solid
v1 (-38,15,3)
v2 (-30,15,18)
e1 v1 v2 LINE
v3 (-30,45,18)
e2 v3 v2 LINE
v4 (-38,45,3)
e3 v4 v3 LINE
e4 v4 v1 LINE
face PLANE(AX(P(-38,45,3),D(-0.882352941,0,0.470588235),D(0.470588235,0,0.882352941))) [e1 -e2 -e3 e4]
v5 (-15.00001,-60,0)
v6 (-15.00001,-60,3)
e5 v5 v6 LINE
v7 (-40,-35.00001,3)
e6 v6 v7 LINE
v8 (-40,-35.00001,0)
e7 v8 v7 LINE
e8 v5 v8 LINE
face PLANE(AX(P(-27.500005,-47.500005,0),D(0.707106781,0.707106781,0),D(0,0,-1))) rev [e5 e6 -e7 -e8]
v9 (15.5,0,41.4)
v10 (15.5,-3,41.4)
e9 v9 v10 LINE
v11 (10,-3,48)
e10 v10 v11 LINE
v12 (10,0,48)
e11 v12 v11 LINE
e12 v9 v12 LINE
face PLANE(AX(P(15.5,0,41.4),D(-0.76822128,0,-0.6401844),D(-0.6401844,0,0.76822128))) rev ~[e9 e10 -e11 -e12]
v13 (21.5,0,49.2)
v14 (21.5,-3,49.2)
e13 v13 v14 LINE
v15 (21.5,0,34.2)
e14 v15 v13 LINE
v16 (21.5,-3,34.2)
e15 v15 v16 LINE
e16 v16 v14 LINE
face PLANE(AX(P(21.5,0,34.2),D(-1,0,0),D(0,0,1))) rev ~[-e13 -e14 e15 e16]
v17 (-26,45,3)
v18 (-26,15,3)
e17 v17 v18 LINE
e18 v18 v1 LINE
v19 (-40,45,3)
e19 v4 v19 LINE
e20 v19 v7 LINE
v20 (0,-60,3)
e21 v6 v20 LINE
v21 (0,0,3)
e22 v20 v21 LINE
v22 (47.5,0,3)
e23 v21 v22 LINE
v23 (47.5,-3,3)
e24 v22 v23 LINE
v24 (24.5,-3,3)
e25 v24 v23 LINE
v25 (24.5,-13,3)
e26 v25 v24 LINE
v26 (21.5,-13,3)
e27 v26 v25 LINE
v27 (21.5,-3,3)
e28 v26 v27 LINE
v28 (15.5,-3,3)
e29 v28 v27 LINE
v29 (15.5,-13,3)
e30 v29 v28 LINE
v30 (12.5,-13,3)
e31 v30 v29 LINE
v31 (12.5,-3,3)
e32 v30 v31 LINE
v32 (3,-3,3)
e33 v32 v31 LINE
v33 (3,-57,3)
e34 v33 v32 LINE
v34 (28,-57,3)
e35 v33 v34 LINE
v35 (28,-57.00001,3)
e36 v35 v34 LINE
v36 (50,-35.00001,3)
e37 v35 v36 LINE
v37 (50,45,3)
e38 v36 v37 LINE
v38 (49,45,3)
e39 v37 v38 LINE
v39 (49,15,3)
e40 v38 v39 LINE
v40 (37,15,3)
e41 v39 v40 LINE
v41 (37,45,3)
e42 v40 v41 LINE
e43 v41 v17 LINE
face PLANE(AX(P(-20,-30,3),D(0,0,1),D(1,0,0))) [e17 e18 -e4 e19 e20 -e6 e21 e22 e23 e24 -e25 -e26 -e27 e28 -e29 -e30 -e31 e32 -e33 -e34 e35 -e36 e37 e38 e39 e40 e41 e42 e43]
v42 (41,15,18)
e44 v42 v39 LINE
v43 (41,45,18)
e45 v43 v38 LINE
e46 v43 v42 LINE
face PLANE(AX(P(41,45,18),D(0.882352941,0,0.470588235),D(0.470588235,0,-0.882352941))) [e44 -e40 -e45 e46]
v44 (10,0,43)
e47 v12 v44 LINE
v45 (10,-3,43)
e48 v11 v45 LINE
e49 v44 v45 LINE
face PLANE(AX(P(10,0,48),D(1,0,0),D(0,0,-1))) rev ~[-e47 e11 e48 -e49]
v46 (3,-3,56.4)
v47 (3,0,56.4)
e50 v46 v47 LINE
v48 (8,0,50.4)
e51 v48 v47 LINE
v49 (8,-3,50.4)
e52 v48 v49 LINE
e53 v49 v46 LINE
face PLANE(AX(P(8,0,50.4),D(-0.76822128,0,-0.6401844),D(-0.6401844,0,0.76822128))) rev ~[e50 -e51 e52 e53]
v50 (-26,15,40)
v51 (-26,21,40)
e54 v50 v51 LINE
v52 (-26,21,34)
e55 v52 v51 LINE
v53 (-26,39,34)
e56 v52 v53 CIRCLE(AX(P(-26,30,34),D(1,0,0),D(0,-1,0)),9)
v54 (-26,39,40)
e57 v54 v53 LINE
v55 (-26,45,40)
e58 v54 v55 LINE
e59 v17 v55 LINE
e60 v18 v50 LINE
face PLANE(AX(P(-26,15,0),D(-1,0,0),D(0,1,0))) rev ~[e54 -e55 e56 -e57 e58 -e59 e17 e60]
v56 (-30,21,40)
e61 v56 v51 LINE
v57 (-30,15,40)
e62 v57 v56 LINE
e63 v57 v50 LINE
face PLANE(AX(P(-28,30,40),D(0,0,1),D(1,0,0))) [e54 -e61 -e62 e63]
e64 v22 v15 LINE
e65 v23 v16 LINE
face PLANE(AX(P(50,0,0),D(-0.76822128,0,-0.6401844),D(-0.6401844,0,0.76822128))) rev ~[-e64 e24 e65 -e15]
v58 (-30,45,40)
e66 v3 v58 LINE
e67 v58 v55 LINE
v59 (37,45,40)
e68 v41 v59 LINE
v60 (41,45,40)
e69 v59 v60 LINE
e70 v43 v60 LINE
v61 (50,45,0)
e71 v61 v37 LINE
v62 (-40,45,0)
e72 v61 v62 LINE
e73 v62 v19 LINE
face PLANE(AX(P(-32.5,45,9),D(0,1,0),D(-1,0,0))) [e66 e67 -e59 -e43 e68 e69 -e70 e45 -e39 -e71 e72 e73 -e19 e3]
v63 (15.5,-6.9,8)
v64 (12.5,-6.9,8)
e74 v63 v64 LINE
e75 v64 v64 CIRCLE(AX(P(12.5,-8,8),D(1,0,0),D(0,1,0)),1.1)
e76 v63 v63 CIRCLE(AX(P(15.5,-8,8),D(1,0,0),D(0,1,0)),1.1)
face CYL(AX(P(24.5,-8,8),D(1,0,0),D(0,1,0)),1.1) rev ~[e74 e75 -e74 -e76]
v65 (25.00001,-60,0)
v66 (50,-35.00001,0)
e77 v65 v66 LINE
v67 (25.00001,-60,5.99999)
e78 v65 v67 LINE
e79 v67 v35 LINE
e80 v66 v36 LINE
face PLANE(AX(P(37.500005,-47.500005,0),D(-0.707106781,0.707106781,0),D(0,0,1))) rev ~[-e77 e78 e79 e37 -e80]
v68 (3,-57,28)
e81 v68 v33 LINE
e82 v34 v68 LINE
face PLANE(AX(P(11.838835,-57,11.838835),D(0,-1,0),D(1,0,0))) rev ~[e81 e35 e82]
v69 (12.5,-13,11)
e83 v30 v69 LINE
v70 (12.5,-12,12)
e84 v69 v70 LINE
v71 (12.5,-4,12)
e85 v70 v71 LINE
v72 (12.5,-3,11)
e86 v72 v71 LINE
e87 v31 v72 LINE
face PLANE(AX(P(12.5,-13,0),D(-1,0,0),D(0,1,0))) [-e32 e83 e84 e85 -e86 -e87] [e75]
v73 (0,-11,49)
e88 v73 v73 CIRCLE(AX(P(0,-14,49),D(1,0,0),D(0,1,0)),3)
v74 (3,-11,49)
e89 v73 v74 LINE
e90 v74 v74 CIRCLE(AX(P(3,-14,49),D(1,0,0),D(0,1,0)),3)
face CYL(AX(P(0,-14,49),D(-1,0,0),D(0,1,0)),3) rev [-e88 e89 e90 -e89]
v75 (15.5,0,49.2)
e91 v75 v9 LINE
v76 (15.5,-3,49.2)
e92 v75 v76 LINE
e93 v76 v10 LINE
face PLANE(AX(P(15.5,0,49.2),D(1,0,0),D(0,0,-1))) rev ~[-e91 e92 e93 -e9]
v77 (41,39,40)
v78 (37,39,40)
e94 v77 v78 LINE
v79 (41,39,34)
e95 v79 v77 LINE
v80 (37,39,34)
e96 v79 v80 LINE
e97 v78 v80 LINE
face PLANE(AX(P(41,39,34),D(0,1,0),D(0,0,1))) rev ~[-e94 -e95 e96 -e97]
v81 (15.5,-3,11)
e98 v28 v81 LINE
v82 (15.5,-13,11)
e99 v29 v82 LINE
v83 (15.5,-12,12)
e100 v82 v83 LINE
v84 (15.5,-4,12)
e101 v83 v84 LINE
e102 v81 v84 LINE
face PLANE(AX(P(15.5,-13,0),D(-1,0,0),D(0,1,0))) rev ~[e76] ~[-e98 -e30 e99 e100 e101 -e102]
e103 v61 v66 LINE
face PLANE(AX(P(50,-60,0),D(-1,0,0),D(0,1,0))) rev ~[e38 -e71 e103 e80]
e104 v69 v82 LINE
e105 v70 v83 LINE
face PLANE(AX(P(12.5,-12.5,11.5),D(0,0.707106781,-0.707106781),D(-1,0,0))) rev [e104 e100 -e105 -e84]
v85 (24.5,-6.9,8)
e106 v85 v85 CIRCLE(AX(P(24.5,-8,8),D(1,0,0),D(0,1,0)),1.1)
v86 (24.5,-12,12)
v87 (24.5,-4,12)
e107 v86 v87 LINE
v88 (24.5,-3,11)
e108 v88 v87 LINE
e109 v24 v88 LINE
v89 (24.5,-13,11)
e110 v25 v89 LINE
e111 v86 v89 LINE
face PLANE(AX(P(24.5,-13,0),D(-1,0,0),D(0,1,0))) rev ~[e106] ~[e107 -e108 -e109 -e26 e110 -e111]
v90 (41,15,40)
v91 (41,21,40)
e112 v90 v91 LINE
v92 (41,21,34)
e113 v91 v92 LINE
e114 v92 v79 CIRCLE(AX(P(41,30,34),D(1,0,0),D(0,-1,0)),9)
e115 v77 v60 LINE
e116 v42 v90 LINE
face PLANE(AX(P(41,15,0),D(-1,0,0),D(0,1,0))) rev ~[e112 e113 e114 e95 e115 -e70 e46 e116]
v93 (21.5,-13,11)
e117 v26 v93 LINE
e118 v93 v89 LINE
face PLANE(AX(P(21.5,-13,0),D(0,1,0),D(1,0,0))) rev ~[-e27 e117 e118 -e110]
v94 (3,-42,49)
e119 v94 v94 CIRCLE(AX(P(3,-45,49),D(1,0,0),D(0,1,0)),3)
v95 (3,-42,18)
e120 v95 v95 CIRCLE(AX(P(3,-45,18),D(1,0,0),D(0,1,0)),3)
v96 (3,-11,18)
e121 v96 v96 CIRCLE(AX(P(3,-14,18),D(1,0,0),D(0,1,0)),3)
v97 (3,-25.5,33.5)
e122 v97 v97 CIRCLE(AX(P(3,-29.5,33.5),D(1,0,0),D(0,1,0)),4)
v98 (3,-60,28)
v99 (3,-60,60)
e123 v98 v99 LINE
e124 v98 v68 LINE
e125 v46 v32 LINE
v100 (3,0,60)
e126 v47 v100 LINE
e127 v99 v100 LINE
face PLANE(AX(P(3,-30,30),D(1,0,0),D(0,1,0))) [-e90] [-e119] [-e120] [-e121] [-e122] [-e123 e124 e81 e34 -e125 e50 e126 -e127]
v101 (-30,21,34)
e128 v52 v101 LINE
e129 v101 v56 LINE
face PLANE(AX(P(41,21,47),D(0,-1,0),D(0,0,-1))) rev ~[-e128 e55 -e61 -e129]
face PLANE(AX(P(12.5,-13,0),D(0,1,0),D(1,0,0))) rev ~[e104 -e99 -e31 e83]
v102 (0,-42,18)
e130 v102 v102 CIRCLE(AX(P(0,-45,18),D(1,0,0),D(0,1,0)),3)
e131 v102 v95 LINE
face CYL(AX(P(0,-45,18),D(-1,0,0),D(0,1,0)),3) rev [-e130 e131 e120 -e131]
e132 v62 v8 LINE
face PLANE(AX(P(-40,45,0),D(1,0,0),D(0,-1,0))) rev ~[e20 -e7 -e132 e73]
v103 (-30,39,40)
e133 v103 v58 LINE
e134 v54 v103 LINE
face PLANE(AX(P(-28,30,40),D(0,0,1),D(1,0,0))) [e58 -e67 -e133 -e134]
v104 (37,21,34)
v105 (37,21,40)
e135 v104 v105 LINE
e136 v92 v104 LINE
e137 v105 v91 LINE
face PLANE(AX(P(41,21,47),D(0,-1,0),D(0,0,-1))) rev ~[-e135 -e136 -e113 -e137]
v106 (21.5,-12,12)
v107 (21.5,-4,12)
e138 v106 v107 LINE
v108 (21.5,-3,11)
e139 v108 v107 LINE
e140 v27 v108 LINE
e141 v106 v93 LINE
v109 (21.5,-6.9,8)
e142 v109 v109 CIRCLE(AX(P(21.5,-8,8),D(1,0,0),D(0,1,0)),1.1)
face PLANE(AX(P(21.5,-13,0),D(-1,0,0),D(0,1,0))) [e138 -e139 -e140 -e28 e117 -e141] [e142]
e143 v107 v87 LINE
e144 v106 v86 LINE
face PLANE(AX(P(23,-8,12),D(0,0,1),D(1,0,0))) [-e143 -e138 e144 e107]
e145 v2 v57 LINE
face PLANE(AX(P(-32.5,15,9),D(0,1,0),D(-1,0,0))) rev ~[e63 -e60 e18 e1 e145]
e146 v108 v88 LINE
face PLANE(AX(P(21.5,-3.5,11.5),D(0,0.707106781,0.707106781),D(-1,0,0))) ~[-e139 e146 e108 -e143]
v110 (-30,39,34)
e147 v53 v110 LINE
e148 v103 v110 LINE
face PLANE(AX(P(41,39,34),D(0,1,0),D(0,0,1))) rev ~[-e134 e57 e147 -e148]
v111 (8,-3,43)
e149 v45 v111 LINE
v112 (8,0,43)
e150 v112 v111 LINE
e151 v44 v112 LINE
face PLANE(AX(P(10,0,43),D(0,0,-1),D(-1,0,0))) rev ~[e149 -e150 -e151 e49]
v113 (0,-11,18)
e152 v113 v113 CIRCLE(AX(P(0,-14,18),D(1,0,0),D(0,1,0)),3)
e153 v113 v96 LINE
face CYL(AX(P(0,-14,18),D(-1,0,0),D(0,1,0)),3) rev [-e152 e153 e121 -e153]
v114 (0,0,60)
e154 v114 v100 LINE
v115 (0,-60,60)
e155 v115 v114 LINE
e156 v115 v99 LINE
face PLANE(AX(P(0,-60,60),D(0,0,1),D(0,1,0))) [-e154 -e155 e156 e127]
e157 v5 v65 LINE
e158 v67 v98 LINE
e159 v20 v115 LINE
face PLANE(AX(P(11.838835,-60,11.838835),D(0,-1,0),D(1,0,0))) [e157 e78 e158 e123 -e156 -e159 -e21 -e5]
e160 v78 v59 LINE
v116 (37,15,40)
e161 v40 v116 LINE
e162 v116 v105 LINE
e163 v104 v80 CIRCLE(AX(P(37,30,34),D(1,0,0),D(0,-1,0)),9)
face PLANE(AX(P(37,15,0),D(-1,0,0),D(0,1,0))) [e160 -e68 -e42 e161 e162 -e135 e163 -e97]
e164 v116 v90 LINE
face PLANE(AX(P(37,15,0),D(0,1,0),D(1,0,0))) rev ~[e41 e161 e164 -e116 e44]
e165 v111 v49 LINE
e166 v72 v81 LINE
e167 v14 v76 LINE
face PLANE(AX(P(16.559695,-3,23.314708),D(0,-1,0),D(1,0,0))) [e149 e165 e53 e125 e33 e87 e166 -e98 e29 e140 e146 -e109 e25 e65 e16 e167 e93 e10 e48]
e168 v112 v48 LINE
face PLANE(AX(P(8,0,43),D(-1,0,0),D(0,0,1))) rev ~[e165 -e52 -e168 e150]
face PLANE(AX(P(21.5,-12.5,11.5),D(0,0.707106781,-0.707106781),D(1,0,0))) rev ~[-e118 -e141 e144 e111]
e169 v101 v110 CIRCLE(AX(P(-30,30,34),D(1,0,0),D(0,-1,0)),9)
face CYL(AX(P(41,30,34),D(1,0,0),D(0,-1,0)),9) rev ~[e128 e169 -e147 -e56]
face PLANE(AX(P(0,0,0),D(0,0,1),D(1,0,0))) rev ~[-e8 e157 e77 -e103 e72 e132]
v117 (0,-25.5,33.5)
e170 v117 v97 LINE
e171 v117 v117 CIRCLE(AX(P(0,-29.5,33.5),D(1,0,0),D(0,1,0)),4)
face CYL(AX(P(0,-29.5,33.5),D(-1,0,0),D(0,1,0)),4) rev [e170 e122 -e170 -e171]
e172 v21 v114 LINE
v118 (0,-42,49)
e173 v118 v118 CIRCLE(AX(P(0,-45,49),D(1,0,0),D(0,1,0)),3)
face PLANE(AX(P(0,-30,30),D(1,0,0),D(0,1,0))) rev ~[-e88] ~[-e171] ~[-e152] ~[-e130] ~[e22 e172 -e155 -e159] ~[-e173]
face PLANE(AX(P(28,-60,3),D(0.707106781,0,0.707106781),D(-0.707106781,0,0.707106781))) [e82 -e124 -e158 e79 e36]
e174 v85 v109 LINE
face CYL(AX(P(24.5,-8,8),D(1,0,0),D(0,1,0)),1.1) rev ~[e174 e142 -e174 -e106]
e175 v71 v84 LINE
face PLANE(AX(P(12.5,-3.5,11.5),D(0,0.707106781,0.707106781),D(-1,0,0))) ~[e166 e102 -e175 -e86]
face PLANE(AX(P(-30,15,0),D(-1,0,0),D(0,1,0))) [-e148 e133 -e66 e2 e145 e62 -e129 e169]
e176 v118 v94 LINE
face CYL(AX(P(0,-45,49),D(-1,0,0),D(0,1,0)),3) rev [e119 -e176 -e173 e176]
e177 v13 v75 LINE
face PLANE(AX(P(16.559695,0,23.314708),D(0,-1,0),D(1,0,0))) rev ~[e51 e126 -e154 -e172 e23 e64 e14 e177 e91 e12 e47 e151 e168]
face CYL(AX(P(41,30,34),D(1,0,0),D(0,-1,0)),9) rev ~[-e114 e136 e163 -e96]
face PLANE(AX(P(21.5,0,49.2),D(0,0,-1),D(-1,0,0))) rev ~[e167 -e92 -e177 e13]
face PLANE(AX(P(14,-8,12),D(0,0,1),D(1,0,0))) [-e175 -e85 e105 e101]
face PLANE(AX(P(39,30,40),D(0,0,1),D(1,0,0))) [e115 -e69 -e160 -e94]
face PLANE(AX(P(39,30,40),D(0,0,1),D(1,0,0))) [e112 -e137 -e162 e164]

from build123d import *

# Parameters (mm, degrees)
F0_W      = 40
F0_H      = 60
F0_W_2    = 50
F0_W_3    = 3
F0_H_2    = 10
F1_DEPTH  = 3
F0_W_4    = 4
F0_H_3    = 30
F2_DEPTH  = 40
F3_DEPTH  = 12
F4_SIZE   = 1
F5_R      = 1.1
F6_DEPTH  = 13
F7_W      = 60
F7_H      = 60
F7_R      = 3
F7_R_2    = 4
F8_DEPTH  = 3
F10_DEPTH = 3
F12_DEPTH = 100
F14_DEPTH = 3
F15_SIZE  = 24.99999
F17_DEPTH = 30


# Not quite as in the source:
# - a fillet or chamfer is up to 0.001 mm smaller than in the source, because OpenCascade refuses the exact size
# - a feature names something its author has since deleted; it is built from what else it names


with BuildPart() as f1:
    # F0 (on Top) → F1 (new body)
    with BuildSketch(Plane.XY):
        with Locations((-20, -30)):
            Rectangle(F0_W, F0_H)
        with Locations((25, -30)):
            Rectangle(F0_W_2, F0_H)
        with Locations((14, -8)):
            Rectangle(F0_W_3, F0_H_2, mode=Mode.SUBTRACT)
        with Locations((23, -8)):
            Rectangle(F0_W_3, F0_H_2, mode=Mode.SUBTRACT)
        Polygon((0, 45), (0, 0), (50, 0), (50, 45), (41, 45), (41, 15), (37, 15), (37, 45), align=None)
        Polygon((-40, 0), (0, 0), (0, 45), (-26, 45), (-26, 15), (-30, 15), (-30, 45), (-40, 45), align=None)
    extrude(amount=F1_DEPTH)

    # F0 (on Top) → F2 (join)
    with BuildSketch(Plane.XY):
        with Locations((-28, 30)):
            Rectangle(F0_W_4, F0_H_3)
        with Locations((39, 30)):
            Rectangle(F0_W_4, F0_H_3)
    extrude(amount=F2_DEPTH)

    # F0 (on Top) → F3 (join)
    with BuildSketch(Plane.XY):
        with Locations((23, -8)):
            Rectangle(F0_W_3, F0_H_2)
        with Locations((14, -8)):
            Rectangle(F0_W_3, F0_H_2)
    extrude(amount=F3_DEPTH)

    # F4
    f4_edges = [f1.edges().sort_by_distance(p)[0] for p in [
        (14, -3, 12),
        (23, -3, 12),
        (23, -13, 12),
        (14, -13, 12),
    ]]
    chamfer(f4_edges, length=F4_SIZE)

    # F5 (on face) → F6 (cut)
    with BuildSketch(Plane.YZ.offset(24.5)):
        with Locations((-8, 8)):
            Circle(F5_R)
    extrude(amount=-F6_DEPTH, mode=Mode.SUBTRACT)

    # F7 (on Right) → F8 (join)
    with BuildSketch(Plane.YZ):
        with Locations((-30, 30)):
            Rectangle(F7_W, F7_H)
        with Locations((-45, 18)):
            Circle(F7_R, mode=Mode.SUBTRACT)
        with Locations((-14, 18)):
            Circle(F7_R, mode=Mode.SUBTRACT)
        with Locations((-45, 49)):
            Circle(F7_R, mode=Mode.SUBTRACT)
        with Locations((-29.5, 33.5)):
            Circle(F7_R_2, mode=Mode.SUBTRACT)
        with Locations((-14, 49)):
            Circle(F7_R, mode=Mode.SUBTRACT)
    extrude(amount=F8_DEPTH)

    # F9 (on Front) → F10 (join)
    with BuildSketch(Plane.XZ):
        Polygon((0, 60), (0, 0), (50, 0), (21.5, 34.2), (15.5, 41.4), (10, 48), (10, 43), (8, 43), (8, 50.4), align=None)
        Polygon((15.5, 41.4), (21.5, 34.2), (21.5, 49.2), (15.5, 49.2), align=None)
    extrude(amount=F10_DEPTH)

    # F11 (on face) → F12 (cut)
    with BuildSketch(Plane.YZ.offset(41)):
        with BuildLine():
            Line((21, 40), (23.2917960675, 40))
            ThreePointArc((23.2917960675, 40), (30, 43), (36.7082039325, 40))
            Line((36.7082039325, 40), (39, 40))
            Line((39, 40), (39, 47))
            Line((39, 47), (21, 47))
            Line((21, 47), (21, 40))
        make_face()
        with BuildLine():
            ThreePointArc((23.2917960675, 40), (21.5924487693, 37.211398808), (21, 34))
            ThreePointArc((21, 34), (30, 25), (39, 34))
            ThreePointArc((39, 34), (38.4075512307, 37.211398808), (36.7082039325, 40))
            Line((36.7082039325, 40), (23.2917960675, 40))
        make_face()
        with BuildLine():
            Line((21, 40), (21, 34))
            ThreePointArc((21, 34), (21.5924487693, 37.211398808), (23.2917960675, 40))
            Line((23.2917960675, 40), (21, 40))
        make_face()
        with BuildLine():
            ThreePointArc((36.7082039325, 40), (38.4075512307, 37.211398808), (39, 34))
            Line((39, 34), (39, 40))
            Line((39, 40), (36.7082039325, 40))
        make_face()
    extrude(amount=-F12_DEPTH, mode=Mode.SUBTRACT)

    # F13 (on face) → F14 (join)
    with BuildSketch(Plane.XZ.offset(60)):
        Polygon((3, 28), (3, 3), (28, 3), align=None)
    extrude(amount=-F14_DEPTH)

    # F15 (size 25 in the source; OpenCascade refuses exactly that, so slightly less here)
    f15_edges = [f1.edges().sort_by_distance(p)[0] for p in [
        (50, -60, 1.5),
        (-40, -60, 1.5),
    ]]
    chamfer(f15_edges, length=F15_SIZE)

    # F16 (on face) → F17 (join)
    with BuildSketch(Plane(origin=(0, 45, 0), x_dir=(-1, 0, 0), z_dir=(0, 1, 0))):
        Polygon((30, 3), (38, 3), (30, 18), align=None)
        Polygon((-49, 3), (-41, 3), (-41, 18), align=None)
    extrude(amount=-F17_DEPTH)


solid = f1.part
